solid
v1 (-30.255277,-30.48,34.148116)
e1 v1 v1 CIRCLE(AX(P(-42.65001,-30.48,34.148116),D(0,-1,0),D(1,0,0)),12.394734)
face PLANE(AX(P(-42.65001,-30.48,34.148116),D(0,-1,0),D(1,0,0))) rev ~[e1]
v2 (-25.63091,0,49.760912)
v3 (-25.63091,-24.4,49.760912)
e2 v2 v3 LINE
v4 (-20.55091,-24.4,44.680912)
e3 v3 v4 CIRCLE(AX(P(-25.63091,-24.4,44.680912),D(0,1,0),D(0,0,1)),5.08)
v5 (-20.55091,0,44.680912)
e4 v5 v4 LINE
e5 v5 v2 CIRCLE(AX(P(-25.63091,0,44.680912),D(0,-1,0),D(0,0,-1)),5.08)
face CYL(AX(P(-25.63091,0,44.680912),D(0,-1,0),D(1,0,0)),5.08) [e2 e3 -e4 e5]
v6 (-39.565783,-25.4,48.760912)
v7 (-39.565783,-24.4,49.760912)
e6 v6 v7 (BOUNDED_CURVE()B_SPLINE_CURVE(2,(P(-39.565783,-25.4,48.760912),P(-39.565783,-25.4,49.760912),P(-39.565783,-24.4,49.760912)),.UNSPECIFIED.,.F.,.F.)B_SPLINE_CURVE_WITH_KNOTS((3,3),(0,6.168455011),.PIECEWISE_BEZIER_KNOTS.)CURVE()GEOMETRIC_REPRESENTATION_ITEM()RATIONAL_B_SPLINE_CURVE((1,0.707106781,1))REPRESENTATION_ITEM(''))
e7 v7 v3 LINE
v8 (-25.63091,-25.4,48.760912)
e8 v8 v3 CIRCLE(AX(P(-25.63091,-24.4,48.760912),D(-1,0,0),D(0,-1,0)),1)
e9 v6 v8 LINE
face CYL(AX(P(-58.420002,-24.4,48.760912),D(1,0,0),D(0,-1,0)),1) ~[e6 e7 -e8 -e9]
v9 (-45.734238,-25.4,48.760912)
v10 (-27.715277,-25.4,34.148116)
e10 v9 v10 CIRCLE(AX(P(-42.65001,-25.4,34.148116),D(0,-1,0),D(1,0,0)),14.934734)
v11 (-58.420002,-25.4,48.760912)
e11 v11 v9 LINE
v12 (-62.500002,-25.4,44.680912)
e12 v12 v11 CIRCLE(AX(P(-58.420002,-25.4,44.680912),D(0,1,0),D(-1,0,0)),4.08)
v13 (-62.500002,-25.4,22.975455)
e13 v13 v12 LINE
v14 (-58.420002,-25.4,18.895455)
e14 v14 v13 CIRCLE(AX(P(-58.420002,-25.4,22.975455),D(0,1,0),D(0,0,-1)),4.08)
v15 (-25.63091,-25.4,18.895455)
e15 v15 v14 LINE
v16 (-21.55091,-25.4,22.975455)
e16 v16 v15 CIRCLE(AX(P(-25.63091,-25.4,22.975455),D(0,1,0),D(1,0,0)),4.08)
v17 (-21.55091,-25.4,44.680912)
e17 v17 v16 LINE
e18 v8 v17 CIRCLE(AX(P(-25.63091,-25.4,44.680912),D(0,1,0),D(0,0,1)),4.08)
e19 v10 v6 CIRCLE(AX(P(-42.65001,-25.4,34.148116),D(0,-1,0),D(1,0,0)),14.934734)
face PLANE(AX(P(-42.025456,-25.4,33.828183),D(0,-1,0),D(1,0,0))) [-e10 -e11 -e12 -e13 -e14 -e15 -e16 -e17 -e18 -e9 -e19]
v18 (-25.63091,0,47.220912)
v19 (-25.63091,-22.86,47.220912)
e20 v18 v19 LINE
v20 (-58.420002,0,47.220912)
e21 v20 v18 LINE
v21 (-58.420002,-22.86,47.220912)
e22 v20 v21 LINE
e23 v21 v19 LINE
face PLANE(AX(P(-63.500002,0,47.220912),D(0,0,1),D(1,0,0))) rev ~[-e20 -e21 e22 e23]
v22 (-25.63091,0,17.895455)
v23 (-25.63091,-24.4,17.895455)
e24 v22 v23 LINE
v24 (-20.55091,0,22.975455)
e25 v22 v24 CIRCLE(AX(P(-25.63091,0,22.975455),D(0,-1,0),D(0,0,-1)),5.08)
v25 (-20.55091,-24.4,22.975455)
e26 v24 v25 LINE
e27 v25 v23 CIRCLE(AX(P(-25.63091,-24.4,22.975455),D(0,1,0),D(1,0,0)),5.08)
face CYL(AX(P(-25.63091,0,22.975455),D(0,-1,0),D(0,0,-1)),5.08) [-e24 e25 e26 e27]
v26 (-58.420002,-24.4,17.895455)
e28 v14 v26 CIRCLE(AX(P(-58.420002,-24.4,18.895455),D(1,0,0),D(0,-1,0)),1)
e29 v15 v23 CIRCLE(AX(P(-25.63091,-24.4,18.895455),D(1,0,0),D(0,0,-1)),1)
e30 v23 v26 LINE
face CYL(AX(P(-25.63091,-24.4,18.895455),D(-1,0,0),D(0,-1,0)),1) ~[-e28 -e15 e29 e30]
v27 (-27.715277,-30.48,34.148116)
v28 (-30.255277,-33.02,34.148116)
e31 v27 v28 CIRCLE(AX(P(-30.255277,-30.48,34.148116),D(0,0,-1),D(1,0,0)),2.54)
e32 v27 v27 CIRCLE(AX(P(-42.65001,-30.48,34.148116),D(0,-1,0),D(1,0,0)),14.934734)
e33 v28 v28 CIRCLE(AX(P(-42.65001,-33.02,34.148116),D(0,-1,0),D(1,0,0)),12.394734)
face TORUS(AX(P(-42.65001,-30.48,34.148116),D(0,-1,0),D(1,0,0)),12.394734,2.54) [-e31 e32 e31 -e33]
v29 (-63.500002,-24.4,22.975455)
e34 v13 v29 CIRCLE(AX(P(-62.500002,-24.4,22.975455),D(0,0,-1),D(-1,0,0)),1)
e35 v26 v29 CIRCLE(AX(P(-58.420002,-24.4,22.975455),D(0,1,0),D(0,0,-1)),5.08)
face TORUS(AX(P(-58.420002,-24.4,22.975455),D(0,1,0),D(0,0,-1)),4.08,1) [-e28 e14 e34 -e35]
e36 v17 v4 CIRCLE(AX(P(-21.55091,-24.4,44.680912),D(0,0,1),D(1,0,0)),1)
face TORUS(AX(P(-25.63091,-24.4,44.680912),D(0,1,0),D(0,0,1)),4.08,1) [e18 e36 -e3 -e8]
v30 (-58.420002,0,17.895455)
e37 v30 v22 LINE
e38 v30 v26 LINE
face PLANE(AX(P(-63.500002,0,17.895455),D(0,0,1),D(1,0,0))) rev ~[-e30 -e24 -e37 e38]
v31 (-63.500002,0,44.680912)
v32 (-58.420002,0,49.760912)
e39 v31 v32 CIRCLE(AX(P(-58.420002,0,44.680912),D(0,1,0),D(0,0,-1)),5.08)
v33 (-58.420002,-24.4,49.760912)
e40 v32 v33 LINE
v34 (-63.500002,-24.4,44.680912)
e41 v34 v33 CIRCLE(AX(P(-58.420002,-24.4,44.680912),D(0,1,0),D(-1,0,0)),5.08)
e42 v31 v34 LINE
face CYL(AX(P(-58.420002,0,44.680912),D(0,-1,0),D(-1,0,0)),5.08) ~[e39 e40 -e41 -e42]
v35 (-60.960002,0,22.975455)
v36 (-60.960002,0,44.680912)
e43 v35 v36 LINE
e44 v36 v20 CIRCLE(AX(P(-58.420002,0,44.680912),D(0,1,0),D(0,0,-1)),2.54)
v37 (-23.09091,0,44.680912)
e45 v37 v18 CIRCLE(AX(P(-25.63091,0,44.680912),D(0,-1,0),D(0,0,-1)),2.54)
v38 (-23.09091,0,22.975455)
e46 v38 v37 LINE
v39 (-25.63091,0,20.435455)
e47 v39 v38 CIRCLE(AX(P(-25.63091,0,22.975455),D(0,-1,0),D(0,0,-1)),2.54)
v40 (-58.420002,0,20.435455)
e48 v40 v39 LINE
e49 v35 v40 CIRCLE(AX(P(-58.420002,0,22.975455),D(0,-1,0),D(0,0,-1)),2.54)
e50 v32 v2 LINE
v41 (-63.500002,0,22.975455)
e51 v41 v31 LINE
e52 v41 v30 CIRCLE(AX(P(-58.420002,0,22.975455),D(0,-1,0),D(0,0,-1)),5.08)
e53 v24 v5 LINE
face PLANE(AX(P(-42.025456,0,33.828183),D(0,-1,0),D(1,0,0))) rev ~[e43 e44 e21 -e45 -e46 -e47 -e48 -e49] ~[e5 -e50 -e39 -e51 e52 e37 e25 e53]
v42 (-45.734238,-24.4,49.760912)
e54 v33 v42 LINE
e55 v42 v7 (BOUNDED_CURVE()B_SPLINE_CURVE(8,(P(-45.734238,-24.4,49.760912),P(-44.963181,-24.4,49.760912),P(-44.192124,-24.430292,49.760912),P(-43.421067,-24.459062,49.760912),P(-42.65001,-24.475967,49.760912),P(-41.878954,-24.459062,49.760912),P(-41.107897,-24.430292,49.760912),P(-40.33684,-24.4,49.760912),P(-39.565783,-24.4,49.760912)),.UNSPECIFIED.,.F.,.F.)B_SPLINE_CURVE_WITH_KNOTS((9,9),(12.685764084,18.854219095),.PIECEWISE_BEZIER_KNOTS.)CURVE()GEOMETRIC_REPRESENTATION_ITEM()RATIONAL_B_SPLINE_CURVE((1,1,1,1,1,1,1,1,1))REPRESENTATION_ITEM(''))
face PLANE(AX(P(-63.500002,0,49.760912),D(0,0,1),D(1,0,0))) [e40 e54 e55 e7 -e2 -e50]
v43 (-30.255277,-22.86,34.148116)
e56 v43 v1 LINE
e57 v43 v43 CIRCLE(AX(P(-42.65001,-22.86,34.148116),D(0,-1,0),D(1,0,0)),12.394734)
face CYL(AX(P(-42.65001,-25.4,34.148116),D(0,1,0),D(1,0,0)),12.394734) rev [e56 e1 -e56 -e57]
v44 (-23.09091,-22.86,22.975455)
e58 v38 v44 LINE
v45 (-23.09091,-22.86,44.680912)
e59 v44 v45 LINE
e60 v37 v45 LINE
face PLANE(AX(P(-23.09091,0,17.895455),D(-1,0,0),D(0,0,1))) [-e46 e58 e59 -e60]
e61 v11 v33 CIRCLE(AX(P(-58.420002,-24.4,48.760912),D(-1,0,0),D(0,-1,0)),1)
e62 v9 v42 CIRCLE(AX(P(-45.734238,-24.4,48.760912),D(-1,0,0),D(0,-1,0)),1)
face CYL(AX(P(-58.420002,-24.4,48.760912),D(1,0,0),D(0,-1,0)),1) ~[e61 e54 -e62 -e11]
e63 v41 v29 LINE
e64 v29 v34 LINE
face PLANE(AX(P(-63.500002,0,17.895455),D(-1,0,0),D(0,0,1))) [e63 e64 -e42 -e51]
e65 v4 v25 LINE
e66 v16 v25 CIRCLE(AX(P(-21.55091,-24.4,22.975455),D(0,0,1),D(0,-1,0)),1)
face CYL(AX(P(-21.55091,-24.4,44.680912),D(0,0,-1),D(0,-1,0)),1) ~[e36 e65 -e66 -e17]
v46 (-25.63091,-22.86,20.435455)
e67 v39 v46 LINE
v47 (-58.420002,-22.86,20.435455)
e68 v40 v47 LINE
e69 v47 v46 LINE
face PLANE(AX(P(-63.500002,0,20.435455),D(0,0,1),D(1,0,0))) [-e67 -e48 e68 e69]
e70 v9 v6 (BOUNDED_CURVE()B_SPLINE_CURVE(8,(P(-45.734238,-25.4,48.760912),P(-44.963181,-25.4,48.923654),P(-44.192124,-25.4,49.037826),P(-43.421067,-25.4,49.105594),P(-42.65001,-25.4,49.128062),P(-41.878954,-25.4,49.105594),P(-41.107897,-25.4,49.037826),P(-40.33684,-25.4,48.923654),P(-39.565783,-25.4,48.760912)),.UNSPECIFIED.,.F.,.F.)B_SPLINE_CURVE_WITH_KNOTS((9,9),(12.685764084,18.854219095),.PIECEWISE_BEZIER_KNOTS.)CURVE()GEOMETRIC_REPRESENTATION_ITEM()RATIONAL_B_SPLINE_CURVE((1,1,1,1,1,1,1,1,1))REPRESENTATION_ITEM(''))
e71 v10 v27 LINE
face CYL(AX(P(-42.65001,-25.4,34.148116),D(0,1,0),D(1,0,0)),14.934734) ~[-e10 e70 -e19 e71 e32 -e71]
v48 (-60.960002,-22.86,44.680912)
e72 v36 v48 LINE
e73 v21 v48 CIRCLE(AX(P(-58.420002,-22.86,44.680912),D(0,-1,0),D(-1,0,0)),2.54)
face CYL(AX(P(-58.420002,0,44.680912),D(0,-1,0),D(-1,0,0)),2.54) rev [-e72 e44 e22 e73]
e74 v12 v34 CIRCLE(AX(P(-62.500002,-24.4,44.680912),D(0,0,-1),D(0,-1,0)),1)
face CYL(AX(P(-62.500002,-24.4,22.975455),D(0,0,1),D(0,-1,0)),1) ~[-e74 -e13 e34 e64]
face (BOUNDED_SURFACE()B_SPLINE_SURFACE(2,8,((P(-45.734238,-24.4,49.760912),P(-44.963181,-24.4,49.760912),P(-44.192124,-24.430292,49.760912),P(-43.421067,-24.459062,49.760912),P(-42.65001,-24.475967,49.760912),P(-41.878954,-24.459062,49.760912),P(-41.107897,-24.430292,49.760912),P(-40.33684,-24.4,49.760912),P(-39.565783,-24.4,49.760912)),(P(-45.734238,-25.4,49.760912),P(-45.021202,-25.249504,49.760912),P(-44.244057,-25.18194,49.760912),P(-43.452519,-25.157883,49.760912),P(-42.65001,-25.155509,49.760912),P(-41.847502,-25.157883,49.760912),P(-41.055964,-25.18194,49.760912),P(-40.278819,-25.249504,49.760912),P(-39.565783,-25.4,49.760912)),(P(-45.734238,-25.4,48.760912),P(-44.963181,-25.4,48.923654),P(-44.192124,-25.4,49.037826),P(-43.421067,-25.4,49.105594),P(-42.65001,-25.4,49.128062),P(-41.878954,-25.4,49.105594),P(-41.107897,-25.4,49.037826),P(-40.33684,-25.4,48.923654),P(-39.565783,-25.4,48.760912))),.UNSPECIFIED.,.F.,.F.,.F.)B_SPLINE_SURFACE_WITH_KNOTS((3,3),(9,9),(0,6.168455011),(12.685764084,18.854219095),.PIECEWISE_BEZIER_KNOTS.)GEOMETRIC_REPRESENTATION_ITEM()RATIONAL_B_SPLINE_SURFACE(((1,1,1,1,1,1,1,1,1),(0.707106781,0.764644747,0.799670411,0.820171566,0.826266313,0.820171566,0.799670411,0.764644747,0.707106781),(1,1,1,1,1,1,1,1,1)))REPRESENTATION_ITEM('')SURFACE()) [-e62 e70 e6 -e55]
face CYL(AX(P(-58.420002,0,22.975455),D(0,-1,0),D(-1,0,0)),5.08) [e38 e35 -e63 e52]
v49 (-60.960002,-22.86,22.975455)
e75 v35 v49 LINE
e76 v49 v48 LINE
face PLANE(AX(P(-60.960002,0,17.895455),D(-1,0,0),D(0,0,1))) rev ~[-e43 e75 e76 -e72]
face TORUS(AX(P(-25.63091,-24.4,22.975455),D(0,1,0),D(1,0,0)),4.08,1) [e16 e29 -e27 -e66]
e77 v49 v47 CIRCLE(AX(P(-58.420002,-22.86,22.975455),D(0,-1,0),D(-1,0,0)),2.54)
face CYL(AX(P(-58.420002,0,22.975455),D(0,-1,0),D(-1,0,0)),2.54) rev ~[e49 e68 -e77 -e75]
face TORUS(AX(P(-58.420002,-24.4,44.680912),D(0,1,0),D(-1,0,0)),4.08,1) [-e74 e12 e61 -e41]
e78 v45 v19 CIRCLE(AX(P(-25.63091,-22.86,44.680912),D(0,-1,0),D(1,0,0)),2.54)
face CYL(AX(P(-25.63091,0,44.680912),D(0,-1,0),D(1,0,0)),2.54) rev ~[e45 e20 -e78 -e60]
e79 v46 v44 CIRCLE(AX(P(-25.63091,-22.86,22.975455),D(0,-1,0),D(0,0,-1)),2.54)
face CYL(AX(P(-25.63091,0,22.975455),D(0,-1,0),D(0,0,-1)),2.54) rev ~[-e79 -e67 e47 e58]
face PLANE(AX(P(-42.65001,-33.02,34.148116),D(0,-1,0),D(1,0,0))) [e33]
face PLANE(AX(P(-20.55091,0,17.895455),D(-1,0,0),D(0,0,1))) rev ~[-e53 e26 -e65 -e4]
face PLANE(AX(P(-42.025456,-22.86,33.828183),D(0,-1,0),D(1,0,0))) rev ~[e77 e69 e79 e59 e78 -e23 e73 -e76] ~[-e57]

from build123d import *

# Parameters (mm, degrees)
F0_W     = 42.9490916431
F0_H     = 31.8654570729
F1_DEPTH = 25.4
F2_R     = 5.08
F3_T     = -2.54
F4_R     = 14.9347335013
F5_DEPTH = 7.62
F6_R     = 2.54
F7_T     = 2.54
F8_R     = 1


# Not quite as in the source:
# - a shell that OpenCascade refuses in one call is made with other operations: the cavity is built on its own and cut out


with BuildPart() as f1:
    # F0 (on Front) → F1 (new body)
    with BuildSketch(Plane.XZ):
        with Locations((-42.025456205, 33.8281830773)):
            Rectangle(F0_W, F0_H)
    extrude(amount=F1_DEPTH)

    # F2
    f2_edges = [f1.edges().sort_by_distance(p)[0] for p in [
        (-63.500002, -12.7, 49.760912),
        (-20.55091, -12.7, 49.760912),
        (-20.55091, -12.7, 17.895455),
        (-63.500002, -12.7, 17.895455),
    ]]
    fillet(f2_edges, radius=F2_R)

    # F3
    f3_openings = [f1.faces().sort_by_distance(p)[0] for p in [
        (-42.025456, 0, 33.828183),
    ]]
    offset(amount=F3_T, openings=f3_openings)

    # F4 (on face) → F5 (join)
    with BuildSketch(Plane.XZ.offset(25.4)):
        with Locations((-42.6500104368, 34.1481156647)):
            Circle(F4_R)
    extrude(amount=F5_DEPTH)

    # F6
    f6_edges = [f1.edges().sort_by_distance(p)[0] for p in [
        (-57.584744, -33.02, 34.148116),
    ]]
    fillet(f6_edges, radius=F6_R)

    # F7: shell of thickness 2.54, made by hand


with BuildPart() as f7_core1:
    # F7_t2: copy of F1
    add(f1.part)

    # the walls: a layer under each face that stays
    f7_faces = [f7_core1.faces().sort_by_distance(p)[0] for p in [
        (-57.5847439381, -27.94, 34.1481156647),
        (-56.341820086, -25.4, 23.206364053),
        (-42.6500104368, -33.02, 34.1481156647),
        (-42.025456205, -12.7, 49.7609116137),
        (-22.038807935, -12.7, 48.2730140621),
        (-62.012104475, -12.7, 48.2730140621),
        (-20.5509103835, -12.7, 33.8281830773),
        (-63.5000020266, -12.7, 33.8281830773),
        (-22.038807935, -12.7, 19.3833520924),
        (-62.012104475, -12.7, 19.3833520924),
        (-42.025456205, -12.7, 17.8954545408),
        (-60.4322097663, 0, 20.1715586175),
        (-42.025456205, -11.43, 47.2209116137),
        (-23.8348591592, -11.43, 46.4769628379),
        (-23.0909103835, -11.43, 33.8281830773),
        (-23.8348591592, -11.43, 21.1794033166),
        (-42.025456205, -11.43, 20.4354545408),
        (-60.2160532508, -11.43, 21.1794033166),
        (-60.9600020266, -11.43, 33.8281830773),
        (-60.2160532508, -11.43, 46.4769628379),
    ]]
    thicken(f7_faces, amount=-F7_T, mode=Mode.SUBTRACT)

    # F7_s3 → F7_t4 (revolve, cut)
    with BuildSketch(Plane.XY.offset(34.1481156647)):
        Polygon((-27.6898769355, -25.4254), (-30.2552769355, -25.4), (-30.2552769355, -22.86), (-27.7152769355, -22.86), align=None)
    revolve(axis=Axis((-42.6500104368, -25.4, 34.1481156647), (0, -1, 0)), mode=Mode.SUBTRACT)


with BuildPart() as f1_1:
    add(f1.part)

    # what is left inside the walls is the cavity
    f7_cavity = [f7_core1.part.solids().sort_by_distance(p)[0] for p in [
        (-55.019344, -27.94, 34.148116),
    ]]
    add(f7_cavity, mode=Mode.SUBTRACT)

    # F8
    f8_edges = [f1_1.edges().sort_by_distance(p)[0] for p in [
        (-42.025456, -25.4, 49.760912),
        (-22.038808, -25.4, 48.273014),
        (-62.012104, -25.4, 48.273014),
        (-20.55091, -25.4, 33.828183),
        (-63.500002, -25.4, 33.828183),
        (-22.038808, -25.4, 19.383352),
        (-62.012104, -25.4, 19.383352),
        (-42.025456, -25.4, 17.895455),
    ]]
    fillet(f8_edges, radius=F8_R)


solid = f1_1.part
